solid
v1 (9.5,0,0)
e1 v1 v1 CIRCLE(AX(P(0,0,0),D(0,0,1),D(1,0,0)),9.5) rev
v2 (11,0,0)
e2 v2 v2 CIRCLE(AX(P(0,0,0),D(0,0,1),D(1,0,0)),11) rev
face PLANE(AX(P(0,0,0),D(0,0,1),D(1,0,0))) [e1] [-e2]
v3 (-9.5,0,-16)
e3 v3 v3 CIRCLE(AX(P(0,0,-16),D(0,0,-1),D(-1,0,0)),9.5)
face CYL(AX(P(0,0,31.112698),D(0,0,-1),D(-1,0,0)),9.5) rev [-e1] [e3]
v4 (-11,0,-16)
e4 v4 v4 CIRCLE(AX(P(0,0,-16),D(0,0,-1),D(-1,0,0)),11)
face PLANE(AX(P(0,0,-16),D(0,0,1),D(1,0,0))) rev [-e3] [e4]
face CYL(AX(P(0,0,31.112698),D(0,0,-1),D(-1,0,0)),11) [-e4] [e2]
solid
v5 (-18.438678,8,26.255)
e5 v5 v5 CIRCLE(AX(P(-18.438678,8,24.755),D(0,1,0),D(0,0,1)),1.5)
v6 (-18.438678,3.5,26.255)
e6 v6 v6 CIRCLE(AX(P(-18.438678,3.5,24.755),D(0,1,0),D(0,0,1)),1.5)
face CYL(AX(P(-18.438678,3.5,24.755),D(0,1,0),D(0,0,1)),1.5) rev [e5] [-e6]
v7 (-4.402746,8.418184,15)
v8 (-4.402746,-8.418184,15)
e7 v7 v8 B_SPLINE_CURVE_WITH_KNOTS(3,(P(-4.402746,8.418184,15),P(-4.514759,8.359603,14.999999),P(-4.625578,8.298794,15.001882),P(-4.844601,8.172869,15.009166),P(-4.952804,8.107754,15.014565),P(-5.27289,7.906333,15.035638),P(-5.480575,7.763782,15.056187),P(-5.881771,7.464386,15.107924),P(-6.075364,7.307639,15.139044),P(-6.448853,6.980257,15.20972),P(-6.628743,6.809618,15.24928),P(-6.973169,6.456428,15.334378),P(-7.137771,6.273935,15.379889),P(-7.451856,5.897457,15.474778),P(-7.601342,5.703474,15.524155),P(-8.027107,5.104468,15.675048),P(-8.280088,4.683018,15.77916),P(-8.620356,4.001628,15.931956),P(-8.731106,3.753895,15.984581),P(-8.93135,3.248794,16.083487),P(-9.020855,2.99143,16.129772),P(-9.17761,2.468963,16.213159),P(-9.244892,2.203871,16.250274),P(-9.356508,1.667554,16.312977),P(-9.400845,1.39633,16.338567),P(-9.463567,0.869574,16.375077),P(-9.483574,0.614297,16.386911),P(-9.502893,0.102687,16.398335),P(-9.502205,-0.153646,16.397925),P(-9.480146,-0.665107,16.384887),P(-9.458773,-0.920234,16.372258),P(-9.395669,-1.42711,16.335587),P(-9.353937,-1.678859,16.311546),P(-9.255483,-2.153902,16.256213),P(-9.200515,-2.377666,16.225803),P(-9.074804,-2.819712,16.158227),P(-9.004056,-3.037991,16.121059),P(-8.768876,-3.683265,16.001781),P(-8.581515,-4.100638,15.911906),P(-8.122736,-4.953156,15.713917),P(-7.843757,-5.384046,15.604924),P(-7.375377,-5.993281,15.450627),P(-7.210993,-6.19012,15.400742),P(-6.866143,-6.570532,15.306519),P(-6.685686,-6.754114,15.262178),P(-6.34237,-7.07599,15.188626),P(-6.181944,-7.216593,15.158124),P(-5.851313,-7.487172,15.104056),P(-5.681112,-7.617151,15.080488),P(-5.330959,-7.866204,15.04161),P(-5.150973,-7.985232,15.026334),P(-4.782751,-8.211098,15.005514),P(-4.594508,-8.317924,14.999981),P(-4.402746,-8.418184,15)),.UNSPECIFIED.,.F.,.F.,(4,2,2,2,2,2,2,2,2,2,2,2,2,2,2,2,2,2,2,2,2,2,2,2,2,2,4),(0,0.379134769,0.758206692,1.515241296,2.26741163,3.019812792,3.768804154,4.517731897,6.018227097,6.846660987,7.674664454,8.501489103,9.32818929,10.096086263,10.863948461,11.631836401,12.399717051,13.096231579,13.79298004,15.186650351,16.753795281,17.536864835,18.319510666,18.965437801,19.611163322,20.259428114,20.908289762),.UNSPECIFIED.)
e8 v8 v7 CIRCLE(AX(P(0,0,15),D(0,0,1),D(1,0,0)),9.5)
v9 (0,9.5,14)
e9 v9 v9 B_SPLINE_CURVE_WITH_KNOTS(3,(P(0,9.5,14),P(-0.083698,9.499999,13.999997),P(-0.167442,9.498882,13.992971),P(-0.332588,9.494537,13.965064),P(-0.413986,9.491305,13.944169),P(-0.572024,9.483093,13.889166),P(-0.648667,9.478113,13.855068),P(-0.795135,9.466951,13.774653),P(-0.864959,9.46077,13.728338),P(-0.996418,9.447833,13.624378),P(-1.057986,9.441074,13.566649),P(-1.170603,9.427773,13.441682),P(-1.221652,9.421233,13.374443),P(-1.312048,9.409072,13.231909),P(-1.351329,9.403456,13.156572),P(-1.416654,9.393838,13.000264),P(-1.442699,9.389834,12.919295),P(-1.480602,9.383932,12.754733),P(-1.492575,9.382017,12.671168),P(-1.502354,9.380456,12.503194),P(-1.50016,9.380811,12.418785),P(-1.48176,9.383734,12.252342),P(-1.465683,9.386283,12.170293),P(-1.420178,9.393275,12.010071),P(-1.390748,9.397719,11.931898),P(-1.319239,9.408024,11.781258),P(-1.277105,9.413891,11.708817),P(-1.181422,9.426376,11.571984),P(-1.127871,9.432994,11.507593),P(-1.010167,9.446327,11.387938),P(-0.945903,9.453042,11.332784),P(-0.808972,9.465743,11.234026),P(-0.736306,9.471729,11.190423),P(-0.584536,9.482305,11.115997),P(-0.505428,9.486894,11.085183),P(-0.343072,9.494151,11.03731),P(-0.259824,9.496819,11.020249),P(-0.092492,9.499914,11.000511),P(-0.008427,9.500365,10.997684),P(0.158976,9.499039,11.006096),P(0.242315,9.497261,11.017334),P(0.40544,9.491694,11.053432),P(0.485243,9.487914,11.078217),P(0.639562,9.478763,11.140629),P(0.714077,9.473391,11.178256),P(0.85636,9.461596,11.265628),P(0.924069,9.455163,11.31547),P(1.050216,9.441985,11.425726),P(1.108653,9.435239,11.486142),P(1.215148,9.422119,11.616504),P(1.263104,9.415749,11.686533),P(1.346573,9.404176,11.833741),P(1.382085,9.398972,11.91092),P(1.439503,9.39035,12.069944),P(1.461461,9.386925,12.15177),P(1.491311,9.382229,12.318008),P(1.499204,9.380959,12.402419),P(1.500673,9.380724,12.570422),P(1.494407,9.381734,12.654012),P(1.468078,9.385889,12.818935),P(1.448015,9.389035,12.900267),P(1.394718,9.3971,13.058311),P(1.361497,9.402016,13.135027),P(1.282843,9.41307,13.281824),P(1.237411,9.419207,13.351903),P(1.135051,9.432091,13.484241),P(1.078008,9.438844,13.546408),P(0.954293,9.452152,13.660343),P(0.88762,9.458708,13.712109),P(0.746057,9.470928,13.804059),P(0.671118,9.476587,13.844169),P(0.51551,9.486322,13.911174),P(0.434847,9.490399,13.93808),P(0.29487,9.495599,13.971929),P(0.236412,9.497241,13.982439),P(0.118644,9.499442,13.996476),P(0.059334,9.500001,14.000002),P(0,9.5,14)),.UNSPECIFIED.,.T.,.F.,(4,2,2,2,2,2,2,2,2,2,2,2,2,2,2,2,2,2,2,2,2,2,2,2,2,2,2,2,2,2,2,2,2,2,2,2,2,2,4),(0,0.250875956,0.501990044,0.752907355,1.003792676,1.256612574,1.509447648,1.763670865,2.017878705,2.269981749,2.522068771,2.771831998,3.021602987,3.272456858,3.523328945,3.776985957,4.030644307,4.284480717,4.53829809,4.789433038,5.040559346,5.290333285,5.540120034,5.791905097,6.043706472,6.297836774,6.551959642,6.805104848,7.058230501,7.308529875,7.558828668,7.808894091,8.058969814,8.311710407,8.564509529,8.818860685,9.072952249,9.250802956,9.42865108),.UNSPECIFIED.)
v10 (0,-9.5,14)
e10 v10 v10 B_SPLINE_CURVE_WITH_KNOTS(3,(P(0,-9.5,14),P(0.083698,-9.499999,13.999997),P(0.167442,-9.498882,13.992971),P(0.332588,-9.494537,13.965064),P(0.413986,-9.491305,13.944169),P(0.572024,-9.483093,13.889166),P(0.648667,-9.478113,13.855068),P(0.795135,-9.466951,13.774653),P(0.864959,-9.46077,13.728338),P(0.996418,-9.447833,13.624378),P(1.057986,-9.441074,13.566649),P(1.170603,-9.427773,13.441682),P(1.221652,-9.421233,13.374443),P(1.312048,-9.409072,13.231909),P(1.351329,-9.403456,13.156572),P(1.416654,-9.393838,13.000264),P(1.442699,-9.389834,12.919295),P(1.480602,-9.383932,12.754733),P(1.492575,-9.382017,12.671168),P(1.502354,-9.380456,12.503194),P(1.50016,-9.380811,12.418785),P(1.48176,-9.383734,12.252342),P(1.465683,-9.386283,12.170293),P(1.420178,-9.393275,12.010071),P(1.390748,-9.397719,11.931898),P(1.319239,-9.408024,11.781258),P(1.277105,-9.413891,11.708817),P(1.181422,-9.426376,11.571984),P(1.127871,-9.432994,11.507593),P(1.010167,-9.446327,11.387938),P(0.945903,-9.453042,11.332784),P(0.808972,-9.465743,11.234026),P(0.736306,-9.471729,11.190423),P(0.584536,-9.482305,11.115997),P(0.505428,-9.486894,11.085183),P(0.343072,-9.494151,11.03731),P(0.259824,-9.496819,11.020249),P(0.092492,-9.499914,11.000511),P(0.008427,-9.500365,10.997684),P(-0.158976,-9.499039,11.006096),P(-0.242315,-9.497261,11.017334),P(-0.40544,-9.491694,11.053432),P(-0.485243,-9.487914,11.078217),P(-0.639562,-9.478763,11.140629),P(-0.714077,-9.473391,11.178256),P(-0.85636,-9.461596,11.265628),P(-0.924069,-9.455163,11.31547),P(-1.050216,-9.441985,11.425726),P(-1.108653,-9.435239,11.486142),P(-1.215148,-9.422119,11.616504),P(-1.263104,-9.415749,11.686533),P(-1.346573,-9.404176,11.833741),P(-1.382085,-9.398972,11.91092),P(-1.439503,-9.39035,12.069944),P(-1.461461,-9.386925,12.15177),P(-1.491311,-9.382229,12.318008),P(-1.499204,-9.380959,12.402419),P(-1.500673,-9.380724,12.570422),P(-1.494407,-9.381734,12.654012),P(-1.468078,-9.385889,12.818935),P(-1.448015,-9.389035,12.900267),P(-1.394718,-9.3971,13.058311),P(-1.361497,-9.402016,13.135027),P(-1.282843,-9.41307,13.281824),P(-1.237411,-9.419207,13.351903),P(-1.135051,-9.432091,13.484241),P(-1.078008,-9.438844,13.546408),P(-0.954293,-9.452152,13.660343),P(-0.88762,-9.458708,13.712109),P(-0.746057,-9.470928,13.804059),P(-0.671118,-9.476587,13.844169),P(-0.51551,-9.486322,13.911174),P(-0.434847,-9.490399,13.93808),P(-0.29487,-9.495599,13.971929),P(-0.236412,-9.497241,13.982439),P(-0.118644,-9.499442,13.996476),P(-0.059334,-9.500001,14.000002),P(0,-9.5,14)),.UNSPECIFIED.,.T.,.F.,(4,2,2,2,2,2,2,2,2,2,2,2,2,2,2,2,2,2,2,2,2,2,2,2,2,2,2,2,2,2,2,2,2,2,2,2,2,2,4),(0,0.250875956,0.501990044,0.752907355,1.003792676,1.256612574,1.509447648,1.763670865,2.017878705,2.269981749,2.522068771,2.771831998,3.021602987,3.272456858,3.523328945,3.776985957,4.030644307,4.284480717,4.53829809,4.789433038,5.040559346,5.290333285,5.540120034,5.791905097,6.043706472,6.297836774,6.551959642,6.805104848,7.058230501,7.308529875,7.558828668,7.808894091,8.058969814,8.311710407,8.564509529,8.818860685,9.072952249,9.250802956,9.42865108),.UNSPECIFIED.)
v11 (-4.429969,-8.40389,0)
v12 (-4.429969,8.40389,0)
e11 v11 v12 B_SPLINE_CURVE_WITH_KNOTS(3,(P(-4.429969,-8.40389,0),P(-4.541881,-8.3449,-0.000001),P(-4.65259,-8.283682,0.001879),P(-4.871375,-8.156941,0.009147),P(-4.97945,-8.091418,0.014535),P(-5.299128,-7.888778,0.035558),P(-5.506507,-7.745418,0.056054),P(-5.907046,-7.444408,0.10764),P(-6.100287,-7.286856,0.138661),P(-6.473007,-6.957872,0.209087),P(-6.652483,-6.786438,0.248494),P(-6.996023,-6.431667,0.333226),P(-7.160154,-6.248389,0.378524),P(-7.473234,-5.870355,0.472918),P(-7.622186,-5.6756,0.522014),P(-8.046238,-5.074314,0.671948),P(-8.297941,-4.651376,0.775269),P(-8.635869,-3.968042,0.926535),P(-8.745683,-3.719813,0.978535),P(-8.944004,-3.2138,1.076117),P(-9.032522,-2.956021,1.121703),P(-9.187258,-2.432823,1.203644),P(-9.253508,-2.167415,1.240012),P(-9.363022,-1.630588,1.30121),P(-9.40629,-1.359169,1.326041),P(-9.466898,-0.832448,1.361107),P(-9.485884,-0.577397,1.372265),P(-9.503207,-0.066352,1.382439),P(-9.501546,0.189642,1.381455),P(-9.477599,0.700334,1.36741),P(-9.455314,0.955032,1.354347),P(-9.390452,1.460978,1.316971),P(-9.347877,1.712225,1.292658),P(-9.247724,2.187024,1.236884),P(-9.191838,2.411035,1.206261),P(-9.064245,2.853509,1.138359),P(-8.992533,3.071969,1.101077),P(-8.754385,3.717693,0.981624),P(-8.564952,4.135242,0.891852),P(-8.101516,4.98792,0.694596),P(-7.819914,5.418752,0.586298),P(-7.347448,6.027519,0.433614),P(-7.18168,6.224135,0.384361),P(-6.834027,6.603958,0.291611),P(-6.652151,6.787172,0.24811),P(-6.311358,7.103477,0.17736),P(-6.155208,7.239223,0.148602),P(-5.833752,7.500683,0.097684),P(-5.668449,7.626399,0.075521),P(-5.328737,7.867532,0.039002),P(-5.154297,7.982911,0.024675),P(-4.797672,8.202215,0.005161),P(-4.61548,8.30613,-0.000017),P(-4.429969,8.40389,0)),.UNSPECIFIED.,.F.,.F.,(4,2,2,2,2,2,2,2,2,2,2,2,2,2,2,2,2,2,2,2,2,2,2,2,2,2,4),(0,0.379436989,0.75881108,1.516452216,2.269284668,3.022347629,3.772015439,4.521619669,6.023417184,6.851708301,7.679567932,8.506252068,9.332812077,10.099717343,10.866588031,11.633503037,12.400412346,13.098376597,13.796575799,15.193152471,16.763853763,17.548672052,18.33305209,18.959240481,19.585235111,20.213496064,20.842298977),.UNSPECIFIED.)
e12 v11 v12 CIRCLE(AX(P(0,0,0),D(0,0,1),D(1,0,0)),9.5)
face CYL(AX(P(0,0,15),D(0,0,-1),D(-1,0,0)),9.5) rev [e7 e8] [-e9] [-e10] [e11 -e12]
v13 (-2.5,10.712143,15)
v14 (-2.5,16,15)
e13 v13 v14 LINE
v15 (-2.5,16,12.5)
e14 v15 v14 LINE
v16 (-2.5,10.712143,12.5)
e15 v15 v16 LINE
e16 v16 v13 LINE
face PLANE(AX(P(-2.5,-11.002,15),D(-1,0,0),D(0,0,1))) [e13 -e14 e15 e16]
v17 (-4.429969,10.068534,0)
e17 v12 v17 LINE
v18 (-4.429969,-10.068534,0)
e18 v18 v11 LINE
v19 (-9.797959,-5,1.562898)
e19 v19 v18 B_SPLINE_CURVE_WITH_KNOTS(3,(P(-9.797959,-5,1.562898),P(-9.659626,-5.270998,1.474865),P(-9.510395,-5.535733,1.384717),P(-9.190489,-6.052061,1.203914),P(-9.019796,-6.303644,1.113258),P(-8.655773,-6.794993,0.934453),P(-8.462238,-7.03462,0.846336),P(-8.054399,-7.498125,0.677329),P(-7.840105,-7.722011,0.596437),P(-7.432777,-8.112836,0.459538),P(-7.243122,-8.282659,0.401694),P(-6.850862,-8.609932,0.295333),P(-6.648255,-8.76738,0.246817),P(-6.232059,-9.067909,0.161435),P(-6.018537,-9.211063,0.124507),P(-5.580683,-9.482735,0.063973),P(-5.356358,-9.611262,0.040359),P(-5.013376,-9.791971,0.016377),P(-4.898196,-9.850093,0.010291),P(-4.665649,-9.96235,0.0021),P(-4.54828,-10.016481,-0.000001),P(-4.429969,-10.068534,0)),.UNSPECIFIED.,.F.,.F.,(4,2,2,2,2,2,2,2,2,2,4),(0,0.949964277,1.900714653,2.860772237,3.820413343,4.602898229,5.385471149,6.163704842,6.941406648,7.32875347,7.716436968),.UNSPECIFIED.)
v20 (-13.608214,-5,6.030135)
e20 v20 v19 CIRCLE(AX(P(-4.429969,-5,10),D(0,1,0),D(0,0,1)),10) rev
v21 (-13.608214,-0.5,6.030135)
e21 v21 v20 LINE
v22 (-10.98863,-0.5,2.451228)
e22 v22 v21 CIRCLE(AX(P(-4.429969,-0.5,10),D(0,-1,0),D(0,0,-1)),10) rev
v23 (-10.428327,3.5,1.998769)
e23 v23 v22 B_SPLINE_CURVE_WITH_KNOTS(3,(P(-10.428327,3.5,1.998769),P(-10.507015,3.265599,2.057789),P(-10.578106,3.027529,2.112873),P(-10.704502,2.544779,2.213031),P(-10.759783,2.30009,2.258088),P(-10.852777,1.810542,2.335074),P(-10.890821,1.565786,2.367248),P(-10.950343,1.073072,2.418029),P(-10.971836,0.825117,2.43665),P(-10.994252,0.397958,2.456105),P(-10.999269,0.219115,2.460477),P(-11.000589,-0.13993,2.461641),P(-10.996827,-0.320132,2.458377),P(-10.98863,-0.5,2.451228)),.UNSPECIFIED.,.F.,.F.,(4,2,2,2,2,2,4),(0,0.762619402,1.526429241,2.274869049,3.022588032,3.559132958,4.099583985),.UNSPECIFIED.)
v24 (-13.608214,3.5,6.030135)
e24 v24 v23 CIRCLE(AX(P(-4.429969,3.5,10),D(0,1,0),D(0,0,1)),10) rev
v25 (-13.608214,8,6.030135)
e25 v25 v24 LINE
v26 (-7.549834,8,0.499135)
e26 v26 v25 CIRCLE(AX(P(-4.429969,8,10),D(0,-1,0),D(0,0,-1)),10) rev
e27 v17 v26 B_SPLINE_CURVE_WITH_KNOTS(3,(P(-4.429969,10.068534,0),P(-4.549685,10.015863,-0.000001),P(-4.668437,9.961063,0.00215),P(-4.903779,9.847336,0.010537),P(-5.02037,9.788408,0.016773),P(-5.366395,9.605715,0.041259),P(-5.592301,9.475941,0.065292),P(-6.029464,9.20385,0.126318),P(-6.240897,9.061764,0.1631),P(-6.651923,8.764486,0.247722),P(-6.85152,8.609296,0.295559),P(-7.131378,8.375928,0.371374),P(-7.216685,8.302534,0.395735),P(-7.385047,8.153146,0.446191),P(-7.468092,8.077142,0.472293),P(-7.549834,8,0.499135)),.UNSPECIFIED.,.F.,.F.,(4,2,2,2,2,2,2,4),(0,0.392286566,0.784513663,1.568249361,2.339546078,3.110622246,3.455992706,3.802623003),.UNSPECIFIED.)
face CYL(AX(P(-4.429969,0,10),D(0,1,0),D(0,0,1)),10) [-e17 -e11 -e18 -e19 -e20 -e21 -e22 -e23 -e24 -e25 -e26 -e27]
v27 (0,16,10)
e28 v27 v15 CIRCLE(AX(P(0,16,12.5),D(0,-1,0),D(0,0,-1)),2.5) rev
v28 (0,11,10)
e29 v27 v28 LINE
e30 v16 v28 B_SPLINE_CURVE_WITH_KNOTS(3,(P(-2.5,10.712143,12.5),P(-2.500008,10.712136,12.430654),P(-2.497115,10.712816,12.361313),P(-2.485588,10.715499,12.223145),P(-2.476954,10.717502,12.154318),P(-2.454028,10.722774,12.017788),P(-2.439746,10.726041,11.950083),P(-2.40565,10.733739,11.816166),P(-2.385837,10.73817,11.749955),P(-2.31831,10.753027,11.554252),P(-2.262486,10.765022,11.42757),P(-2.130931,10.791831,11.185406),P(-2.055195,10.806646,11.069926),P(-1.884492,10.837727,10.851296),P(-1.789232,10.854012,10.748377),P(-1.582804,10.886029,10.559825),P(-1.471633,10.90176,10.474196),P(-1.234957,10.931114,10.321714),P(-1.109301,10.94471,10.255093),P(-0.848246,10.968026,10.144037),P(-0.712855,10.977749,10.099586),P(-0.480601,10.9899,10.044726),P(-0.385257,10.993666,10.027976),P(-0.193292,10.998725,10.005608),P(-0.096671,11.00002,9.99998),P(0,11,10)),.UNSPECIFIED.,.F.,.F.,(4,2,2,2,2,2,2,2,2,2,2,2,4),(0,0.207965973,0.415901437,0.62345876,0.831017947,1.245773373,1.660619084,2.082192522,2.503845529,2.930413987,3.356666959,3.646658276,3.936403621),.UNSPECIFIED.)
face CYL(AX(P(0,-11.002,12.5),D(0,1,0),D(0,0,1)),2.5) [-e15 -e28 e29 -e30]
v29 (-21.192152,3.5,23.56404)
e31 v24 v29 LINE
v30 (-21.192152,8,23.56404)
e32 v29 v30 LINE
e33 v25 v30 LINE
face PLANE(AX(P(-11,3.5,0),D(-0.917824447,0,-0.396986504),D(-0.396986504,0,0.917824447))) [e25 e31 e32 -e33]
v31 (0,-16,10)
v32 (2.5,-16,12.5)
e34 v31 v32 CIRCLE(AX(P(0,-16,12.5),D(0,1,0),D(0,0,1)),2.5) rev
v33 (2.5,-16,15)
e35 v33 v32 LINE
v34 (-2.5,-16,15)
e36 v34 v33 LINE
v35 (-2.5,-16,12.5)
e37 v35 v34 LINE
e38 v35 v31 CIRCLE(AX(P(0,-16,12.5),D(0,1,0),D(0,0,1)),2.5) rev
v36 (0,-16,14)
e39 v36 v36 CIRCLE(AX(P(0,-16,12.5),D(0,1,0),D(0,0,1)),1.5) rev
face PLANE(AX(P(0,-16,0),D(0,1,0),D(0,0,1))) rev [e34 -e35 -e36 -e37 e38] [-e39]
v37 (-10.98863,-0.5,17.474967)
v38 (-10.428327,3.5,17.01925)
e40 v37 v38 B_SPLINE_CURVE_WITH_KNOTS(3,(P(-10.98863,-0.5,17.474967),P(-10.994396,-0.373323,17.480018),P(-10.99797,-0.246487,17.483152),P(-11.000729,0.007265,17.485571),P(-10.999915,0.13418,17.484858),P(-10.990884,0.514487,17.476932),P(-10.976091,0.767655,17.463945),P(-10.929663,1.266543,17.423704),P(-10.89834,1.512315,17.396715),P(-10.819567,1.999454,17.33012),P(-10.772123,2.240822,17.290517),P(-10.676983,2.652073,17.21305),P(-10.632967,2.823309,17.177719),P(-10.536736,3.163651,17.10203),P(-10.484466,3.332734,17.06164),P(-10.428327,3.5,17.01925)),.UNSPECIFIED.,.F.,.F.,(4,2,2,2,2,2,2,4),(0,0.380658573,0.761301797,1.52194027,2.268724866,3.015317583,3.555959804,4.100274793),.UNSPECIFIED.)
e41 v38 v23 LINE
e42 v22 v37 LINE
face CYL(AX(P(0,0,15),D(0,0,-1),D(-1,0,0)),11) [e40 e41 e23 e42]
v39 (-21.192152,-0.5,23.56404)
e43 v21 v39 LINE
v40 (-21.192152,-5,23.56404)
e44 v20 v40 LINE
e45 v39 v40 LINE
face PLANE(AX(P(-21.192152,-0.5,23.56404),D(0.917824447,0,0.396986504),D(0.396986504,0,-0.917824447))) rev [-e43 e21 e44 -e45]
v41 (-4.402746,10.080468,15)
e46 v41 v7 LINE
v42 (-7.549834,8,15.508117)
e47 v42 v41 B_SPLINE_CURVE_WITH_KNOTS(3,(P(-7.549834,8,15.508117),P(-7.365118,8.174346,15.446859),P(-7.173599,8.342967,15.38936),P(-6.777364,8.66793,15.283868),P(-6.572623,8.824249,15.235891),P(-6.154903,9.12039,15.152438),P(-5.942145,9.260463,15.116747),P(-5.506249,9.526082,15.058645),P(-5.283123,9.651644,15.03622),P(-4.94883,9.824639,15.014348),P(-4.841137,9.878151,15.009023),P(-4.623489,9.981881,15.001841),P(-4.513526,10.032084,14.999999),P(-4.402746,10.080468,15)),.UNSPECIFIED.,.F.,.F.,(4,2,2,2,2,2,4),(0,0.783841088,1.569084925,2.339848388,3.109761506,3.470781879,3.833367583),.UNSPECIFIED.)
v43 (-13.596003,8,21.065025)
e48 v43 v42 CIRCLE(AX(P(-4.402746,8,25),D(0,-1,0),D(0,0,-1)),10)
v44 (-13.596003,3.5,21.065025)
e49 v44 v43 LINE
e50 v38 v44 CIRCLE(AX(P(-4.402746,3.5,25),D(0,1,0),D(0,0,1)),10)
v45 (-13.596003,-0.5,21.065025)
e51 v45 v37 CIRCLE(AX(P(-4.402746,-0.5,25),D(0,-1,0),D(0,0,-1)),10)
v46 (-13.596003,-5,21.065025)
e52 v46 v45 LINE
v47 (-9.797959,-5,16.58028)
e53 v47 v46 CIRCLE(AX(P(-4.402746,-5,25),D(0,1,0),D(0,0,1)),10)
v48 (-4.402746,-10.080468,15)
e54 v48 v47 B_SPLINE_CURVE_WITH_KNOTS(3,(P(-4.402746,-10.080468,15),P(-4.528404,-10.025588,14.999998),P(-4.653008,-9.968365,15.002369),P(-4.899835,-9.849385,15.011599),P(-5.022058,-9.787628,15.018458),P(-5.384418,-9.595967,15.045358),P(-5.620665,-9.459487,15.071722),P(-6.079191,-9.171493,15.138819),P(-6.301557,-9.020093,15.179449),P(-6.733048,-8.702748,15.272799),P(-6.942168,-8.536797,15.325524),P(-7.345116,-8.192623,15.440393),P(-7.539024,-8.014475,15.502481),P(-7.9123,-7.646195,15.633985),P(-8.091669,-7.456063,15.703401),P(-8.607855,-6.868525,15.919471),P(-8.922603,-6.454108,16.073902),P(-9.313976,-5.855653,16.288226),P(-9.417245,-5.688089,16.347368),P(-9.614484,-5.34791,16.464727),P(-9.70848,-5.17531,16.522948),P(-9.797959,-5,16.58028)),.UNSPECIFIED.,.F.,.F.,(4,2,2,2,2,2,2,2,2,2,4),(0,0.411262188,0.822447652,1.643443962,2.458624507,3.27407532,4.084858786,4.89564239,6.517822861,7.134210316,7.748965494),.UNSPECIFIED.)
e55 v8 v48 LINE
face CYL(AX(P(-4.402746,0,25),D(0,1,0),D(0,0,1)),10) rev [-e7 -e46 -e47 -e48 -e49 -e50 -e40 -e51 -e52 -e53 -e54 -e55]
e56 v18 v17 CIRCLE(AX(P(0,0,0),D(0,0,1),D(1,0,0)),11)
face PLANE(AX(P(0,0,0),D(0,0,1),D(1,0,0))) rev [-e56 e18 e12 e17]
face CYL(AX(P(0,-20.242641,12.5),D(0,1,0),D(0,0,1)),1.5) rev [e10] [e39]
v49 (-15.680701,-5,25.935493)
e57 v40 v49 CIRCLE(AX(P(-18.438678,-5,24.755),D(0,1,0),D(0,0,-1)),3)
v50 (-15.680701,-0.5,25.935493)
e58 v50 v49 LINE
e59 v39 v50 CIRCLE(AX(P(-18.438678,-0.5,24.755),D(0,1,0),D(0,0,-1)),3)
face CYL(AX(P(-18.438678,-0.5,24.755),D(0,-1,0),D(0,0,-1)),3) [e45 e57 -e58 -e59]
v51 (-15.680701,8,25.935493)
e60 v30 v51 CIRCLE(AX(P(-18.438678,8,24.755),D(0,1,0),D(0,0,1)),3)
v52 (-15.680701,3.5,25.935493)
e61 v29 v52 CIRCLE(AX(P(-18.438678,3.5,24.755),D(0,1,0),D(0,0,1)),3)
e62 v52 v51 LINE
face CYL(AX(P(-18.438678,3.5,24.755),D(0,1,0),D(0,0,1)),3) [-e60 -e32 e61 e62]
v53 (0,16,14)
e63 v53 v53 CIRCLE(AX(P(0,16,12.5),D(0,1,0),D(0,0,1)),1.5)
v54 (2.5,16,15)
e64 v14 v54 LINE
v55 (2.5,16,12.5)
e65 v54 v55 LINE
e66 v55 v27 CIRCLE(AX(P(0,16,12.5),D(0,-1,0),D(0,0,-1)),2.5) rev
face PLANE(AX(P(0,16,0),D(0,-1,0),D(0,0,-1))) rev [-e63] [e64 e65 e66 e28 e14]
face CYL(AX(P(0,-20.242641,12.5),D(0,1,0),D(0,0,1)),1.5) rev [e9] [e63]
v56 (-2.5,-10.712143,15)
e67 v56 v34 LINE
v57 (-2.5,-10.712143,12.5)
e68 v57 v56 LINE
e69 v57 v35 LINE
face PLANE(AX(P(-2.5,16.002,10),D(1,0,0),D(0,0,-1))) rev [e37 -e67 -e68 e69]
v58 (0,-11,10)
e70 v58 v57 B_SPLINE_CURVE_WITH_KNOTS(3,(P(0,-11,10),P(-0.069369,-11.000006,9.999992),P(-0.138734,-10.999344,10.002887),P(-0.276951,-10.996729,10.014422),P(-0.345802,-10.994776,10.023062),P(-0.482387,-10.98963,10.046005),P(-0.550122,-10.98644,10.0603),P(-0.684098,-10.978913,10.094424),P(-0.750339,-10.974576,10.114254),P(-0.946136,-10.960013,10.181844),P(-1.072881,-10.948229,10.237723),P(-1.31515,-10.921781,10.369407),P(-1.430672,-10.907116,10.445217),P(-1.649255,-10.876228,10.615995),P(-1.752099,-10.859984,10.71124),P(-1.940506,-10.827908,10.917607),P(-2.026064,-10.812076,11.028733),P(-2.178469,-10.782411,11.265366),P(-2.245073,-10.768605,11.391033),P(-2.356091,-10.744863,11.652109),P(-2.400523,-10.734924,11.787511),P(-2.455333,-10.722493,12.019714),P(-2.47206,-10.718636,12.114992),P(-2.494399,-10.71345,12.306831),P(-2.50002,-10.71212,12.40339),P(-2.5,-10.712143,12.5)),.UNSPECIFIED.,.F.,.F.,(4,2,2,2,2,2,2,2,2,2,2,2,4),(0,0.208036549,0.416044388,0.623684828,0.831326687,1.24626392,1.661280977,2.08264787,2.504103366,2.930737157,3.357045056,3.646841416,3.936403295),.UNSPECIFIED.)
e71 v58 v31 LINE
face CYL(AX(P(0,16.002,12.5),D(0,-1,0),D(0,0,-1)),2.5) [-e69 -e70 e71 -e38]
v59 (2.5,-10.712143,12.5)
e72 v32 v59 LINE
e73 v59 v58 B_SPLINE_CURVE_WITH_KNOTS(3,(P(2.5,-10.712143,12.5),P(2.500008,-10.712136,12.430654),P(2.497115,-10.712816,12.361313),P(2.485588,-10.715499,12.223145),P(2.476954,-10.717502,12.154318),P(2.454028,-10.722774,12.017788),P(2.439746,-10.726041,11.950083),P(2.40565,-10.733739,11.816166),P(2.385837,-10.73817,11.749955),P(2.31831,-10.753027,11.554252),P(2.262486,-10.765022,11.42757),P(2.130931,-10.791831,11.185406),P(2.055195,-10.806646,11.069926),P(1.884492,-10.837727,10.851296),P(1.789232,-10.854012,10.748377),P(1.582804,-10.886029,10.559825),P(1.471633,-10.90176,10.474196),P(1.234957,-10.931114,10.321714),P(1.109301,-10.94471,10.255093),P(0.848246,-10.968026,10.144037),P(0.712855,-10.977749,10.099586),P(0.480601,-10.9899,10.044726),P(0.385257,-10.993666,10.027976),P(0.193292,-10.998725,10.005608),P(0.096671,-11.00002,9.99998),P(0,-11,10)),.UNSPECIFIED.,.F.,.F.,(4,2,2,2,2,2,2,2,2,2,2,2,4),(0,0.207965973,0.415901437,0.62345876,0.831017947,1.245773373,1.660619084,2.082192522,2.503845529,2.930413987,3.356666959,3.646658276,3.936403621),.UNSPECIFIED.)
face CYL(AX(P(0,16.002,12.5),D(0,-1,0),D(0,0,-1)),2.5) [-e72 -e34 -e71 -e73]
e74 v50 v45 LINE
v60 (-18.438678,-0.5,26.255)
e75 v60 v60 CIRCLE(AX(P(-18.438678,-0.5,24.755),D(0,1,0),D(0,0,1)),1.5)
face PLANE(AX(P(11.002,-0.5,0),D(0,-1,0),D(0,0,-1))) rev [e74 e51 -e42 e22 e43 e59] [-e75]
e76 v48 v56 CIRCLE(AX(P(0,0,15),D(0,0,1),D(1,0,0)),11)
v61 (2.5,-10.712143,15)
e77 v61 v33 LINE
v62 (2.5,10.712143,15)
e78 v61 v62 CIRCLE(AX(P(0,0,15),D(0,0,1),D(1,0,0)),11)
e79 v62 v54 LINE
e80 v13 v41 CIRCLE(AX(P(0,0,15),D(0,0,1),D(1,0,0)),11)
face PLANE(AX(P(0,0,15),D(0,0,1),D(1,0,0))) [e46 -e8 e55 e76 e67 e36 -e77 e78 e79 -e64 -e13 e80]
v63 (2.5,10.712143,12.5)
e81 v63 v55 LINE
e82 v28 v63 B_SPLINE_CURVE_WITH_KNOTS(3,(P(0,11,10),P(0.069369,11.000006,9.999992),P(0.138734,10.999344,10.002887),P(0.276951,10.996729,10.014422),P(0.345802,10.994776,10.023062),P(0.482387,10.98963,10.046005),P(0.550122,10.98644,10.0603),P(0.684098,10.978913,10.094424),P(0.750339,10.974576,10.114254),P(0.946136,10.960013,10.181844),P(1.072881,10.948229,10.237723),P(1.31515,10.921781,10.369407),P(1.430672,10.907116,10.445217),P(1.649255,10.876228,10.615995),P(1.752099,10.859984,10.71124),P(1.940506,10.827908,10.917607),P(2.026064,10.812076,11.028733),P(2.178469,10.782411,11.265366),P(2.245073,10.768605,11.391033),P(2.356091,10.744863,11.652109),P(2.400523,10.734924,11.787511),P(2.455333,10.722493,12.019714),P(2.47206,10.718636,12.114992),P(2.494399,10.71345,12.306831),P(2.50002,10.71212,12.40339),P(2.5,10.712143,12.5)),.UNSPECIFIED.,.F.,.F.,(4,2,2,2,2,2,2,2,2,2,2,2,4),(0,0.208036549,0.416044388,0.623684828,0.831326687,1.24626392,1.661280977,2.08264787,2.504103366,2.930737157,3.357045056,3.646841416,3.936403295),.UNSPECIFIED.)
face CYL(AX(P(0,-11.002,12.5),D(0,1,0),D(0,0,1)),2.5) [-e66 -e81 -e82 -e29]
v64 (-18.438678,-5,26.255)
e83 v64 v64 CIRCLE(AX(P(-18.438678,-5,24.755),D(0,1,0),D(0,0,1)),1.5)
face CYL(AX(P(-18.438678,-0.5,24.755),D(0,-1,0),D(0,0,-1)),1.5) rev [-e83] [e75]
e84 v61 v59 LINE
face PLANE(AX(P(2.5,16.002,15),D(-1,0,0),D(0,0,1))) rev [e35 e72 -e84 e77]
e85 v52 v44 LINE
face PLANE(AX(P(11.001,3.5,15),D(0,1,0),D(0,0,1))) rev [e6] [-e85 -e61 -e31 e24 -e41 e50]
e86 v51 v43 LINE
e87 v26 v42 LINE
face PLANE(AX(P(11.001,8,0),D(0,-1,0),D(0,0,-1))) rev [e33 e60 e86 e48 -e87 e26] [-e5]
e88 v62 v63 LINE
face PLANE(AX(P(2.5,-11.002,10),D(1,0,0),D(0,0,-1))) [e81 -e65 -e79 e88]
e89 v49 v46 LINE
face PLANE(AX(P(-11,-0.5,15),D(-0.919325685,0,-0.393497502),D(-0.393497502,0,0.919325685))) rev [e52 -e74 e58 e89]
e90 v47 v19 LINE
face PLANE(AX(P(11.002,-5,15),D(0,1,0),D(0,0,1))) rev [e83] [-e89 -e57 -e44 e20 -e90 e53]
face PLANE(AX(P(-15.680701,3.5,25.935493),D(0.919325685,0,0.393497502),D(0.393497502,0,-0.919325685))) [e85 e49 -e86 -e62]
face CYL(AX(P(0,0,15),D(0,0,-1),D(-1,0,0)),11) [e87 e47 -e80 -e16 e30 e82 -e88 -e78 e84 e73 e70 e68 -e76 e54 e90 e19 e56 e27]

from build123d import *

# Parameters (mm, degrees)
CROQUIS1_R                   = 11
CROQUIS1_R_2                 = 9.5
SALIENTE_EXTRUIR1_DEPTH      = 15
SALIENTE_EXTRUIR2_REACH      = 34.787
SALIENTE_EXTRUIR2_END_RADIUS = 11
CROQUIS2_W                   = 5
CROQUIS2_H                   = 5
SALIENTE_EXTRUIR3_REACH      = 39.014
SALIENTE_EXTRUIR3_END_RADIUS = 11
CROQUIS3_W                   = 5
CROQUIS3_H                   = 5
CORTAR_EXTRUIR1_REACH        = 39.014
CROQUIS4_R                   = 1.5
REDONDEO1_R                  = 2.5
CROQUIS5_R                   = 1.5
SALIENTE_EXTRUIR4_DEPTH      = 4.5
SALIENTE_EXTRUIR5_REACH      = 40.863
CROQUIS6_W                   = 15
CROQUIS6_H                   = 4.5
CROQUIS7_R                   = 1.5
SALIENTE_EXTRUIR6_DEPTH      = 4.5
SALIENTE_EXTRUIR7_REACH      = 40.863
SALIENTE_EXTRUIR7_END_RADIUS = 11
CROQUIS8_W                   = 15
CROQUIS8_H                   = 4.5
REDONDEO4_R                  = 10
CROQUIS17_R                  = 9.5
SALIENTE_EXTRUIR13_DEPTH     = 16
REDONDEO5_R                  = 10


# Some blends are built 0.0001 mm under size
with BuildPart() as part:
    # Croquis1 → Saliente-Extruir1 (new body)
    with BuildSketch(Plane.XY):
        Circle(CROQUIS1_R)
        Circle(CROQUIS1_R_2, mode=Mode.SUBTRACT)
    extrude(amount=SALIENTE_EXTRUIR1_DEPTH)

    # Saliente-Extruir2: up to this cylinder (the profile starts outside it)
    saliente_extruir2_end = Plane(origin=(0, 0, 12.5), z_dir=(0, 0, -1)) * Cylinder(SALIENTE_EXTRUIR2_END_RADIUS, 92.574, mode=Mode.PRIVATE)
    # Croquis2 → Saliente-Extruir2 (add, up to the surface)
    with BuildSketch(Plane(origin=(0, 16, 0), x_dir=(1, 0, 0), z_dir=(0, 1, 0)), mode=Mode.PRIVATE) as saliente_extruir2_sk1:
        with Locations((0, -12.5)):
            Rectangle(CROQUIS2_W, CROQUIS2_H)
    saliente_extruir2_tool1 = extrude(saliente_extruir2_sk1.sketch, amount=-SALIENTE_EXTRUIR2_REACH, mode=Mode.PRIVATE) - saliente_extruir2_end
    add(saliente_extruir2_tool1.solids().sort_by_distance((0, 16, 12.5))[0])

    # Saliente-Extruir3: up to this cylinder (the profile starts outside it)
    saliente_extruir3_end = Plane(origin=(0, 0, 12.5), z_dir=(0, 0, -1)) * Cylinder(SALIENTE_EXTRUIR3_END_RADIUS, 101.028, mode=Mode.PRIVATE)
    # Croquis3 → Saliente-Extruir3 (add, up to the surface)
    with BuildSketch(Plane(origin=(0, -16, 0), x_dir=(1, 0, 0), z_dir=(0, 1, 0)), mode=Mode.PRIVATE) as saliente_extruir3_sk1:
        with Locations((0, -12.5)):
            Rectangle(CROQUIS3_W, CROQUIS3_H)
    saliente_extruir3_tool1 = extrude(saliente_extruir3_sk1.sketch, amount=SALIENTE_EXTRUIR3_REACH, mode=Mode.PRIVATE) - saliente_extruir3_end
    add(saliente_extruir3_tool1.solids().sort_by_distance((0, -16, 12.5))[0])

    # Cortar-Extruir1: up to this face of the body (flat: up to its plane)
    cortar_extruir1_end = Plane(part.part.faces().sort_by_distance((0, -16, 12.5))[0])
    # Croquis4 → Cortar-Extruir1 (cut, up to the picked face)
    with BuildSketch(Plane(origin=(0, 16, 0), x_dir=(1, 0, 0), z_dir=(0, 1, 0)), mode=Mode.PRIVATE) as cortar_extruir1_sk1:
        with Locations(Location((0, -12.5, 0), (0, 0, 270))):
            Circle(CROQUIS4_R)
    cortar_extruir1_tool1 = split(extrude(cortar_extruir1_sk1.sketch, amount=-CORTAR_EXTRUIR1_REACH, mode=Mode.PRIVATE), bisect_by=cortar_extruir1_end, keep=Keep.BOTH, mode=Mode.PRIVATE)
    add(cortar_extruir1_tool1.solids().sort_by(Axis((0, 16, 12.5), (0, -1, 0)))[0], mode=Mode.SUBTRACT)

    # Redondeo1
    redondeo1_edges = [part.edges().sort_by_distance(p)[0] for p in [
        (-2.5, -13.356071321, 10),
        (2.5, -13.356071321, 10),
        (-2.5, 13.356071321, 10),
        (2.5, 13.356071321, 10),
    ]]
    fillet(redondeo1_edges, radius=REDONDEO1_R - 0.0001)  # a hair under: the kernel refuses the full size

    # Croquis6 → Saliente-Extruir5 (add, up to next)
    with BuildSketch(Plane(origin=(-11, 0, 0), x_dir=(0, 0, -1), z_dir=(1, 0, 0)), mode=Mode.PRIVATE) as saliente_extruir5_sk1:
        with Locations((-7.5, -2.75)):
            Rectangle(CROQUIS6_W, CROQUIS6_H)
    saliente_extruir5_tool1 = extrude(saliente_extruir5_sk1.sketch, amount=SALIENTE_EXTRUIR5_REACH, mode=Mode.PRIVATE) - part.part


with BuildPart() as body_2:
    # Croquis5 → Saliente-Extruir4 (new body)
    with BuildSketch(Plane(origin=(0, -5, 0), x_dir=(1, 0, 0), z_dir=(0, 1, 0))):
        with BuildLine():
            Line((-11, -15), (-15.680701356, -25.935492506))
            ThreePointArc((-15.680701356, -25.935492506), (-19.62440656, -27.510730169), (-21.192151754, -23.564040489))
            Line((-21.192151754, -23.564040489), (-11, 0))
            Line((-11, 0), (-11, -15))
        make_face()
        with Locations(Location((-18.438678413, -24.755, 0), (0, 0, 270))):
            Circle(CROQUIS5_R, mode=Mode.SUBTRACT)
    extrude(amount=SALIENTE_EXTRUIR4_DEPTH)


with BuildPart() as part_1:
    add(part.part)

    add(body_2.part)  # Saliente-Extruir5 merges body 2
    add(saliente_extruir5_tool1.solids().sort_by_distance((-11, -2.75, 7.5))[0])



with BuildPart() as body_2_2:
    # Croquis7 → Saliente-Extruir6 (new body)
    with BuildSketch(Plane(origin=(0, 8, 0), x_dir=(1, 0, 0), z_dir=(0, 1, 0))):
        with BuildLine():
            Line((-15.680701356, -25.935492506), (-11, -15))
            Line((-11, -15), (-11, 0))
            Line((-11, 0), (-21.192151754, -23.564040489))
            ThreePointArc((-21.192151754, -23.564040489), (-19.62440656, -27.510730169), (-15.680701356, -25.935492506))
        make_face()
        with Locations(Location((-18.438678413, -24.755, 0), (0, 0, 270))):
            Circle(CROQUIS7_R, mode=Mode.SUBTRACT)
    extrude(amount=-SALIENTE_EXTRUIR6_DEPTH)


with BuildPart() as part_2:
    add(part_1.part)

    add(body_2_2.part)  # Saliente-Extruir7 merges body 2 2
    # Saliente-Extruir7: up to this cylinder (the profile starts outside it)
    saliente_extruir7_end = Plane(origin=(0, 0, 7.5), z_dir=(0, 0, -1)) * Cylinder(SALIENTE_EXTRUIR7_END_RADIUS, 104.726, mode=Mode.PRIVATE)
    # Croquis8 → Saliente-Extruir7 (add, up to the surface)
    with BuildSketch(Plane(origin=(-11, 0, 0), x_dir=(0, 0, -1), z_dir=(1, 0, 0)), mode=Mode.PRIVATE) as saliente_extruir7_sk1:
        with Locations((-7.5, 5.75)):
            Rectangle(CROQUIS8_W, CROQUIS8_H)
    saliente_extruir7_tool1 = extrude(saliente_extruir7_sk1.sketch, amount=SALIENTE_EXTRUIR7_REACH, mode=Mode.PRIVATE) - saliente_extruir7_end
    add(saliente_extruir7_tool1.solids().sort_by_distance((-11, 5.75, 7.5))[0])

    # Redondeo4
    # the kernel refuses this fillet: 10 mm, written as the material it adds along each edge
    with BuildSketch(Plane(origin=(-11, 8, 15), x_dir=(1, 0, 0), z_dir=(0, -1, 0))) as redondeo4_piece_1_section:
        with BuildLine():
            CenterArc((REDONDEO4_R * 0.659725391862, REDONDEO4_R), REDONDEO4_R, 203.1723, 66.8277)
            Line((-REDONDEO4_R * 0.259600293631, REDONDEO4_R * 0.606502498111), (0, 0))
            Line((0, 0), (REDONDEO4_R * 0.659725391862, 0))
        make_face()
    redondeo4_piece_1 = extrude(amount=4.5, mode=Mode.PRIVATE)
    redondeo4_piece_1 = redondeo4_piece_1 - Plane(origin=(0, 0, 16.61768541), x_dir=(1, 0, 0), z_dir=(0, 0, -1)) * Cylinder(9.5, 36, mode=Mode.PRIVATE)
    add(redondeo4_piece_1)
    with BuildSketch(Plane(origin=(-11, 24.493134797, 15), x_dir=(1, 0, 0), z_dir=(0, -1, 0))) as redondeo4_piece_2_section:
        with BuildLine():
            CenterArc((REDONDEO4_R * 0.659725391862, REDONDEO4_R), REDONDEO4_R, 203.1723, 66.8277)
            Line((-REDONDEO4_R * 0.259600293631, REDONDEO4_R * 0.606502498111), (0, 0))
            Line((0, 0), (REDONDEO4_R * 0.659725391862, 0))
        make_face()
    redondeo4_piece_2 = extrude(amount=37.486269593, mode=Mode.PRIVATE)
    redondeo4_piece_2 = redondeo4_piece_2 & Plane(origin=(0, 0, 15.105091538), x_dir=(1, 0, 0), z_dir=(0, 0, -1)) * Cylinder(11, 102, mode=Mode.PRIVATE)
    redondeo4_piece_2 = redondeo4_piece_2 - Plane(origin=(0, 0, 15.105091538), x_dir=(1, 0, 0), z_dir=(0, 0, -1)) * Cylinder(9.5, 102, mode=Mode.PRIVATE)
    add(redondeo4_piece_2)
    with BuildSketch(Plane(origin=(-11, 24.493134797, 15), x_dir=(1, 0, 0), z_dir=(0, -1, 0))) as redondeo4_piece_3_section:
        with BuildLine():
            CenterArc((REDONDEO4_R * 0.659725391862, REDONDEO4_R), REDONDEO4_R, 203.1723, 66.8277)
            Line((-REDONDEO4_R * 0.259600293631, REDONDEO4_R * 0.606502498111), (0, 0))
            Line((0, 0), (REDONDEO4_R * 0.659725391862, 0))
        make_face()
    redondeo4_piece_3 = extrude(amount=37.486269593, mode=Mode.PRIVATE)
    redondeo4_piece_3 = split(redondeo4_piece_3, bisect_by=Plane(origin=(-11.425826718, -5, 17.078004586), z_dir=(0, 1, 0)), keep=Keep.TOP, mode=Mode.PRIVATE)
    redondeo4_piece_3 = split(redondeo4_piece_3, bisect_by=Plane(origin=(-11.425826718, -0.5, 17.078004586), z_dir=(0, -1, 0)), keep=Keep.TOP, mode=Mode.PRIVATE)
    redondeo4_piece_3 = redondeo4_piece_3 - Plane(origin=(0, 0, 17.078004586), x_dir=(1, 0, 0), z_dir=(0, 0, -1)) * Cylinder(9.5, 102, mode=Mode.PRIVATE)
    add(redondeo4_piece_3)

    # Redondeo5
    # the kernel refuses this fillet: 10 mm, written as the material it takes off along each edge
    with BuildSketch(Plane(origin=(-11, -21.425077205, 0), x_dir=(1, 0, 0), z_dir=(0, 1, 0))) as redondeo5_piece_1:
        with BuildLine():
            CenterArc((REDONDEO5_R * 0.657003088186, -REDONDEO5_R), REDONDEO5_R, 90, 66.610075059)
            Line((-REDONDEO5_R * 0.260821358969, -REDONDEO5_R * 0.603013496194), (0, 0))
            Line((0, 0), (REDONDEO5_R * 0.657003088186, 0))
        make_face()
    extrude(amount=37.350154409, mode=Mode.SUBTRACT)


with BuildPart() as body_2_3:
    # Croquis17 → Saliente-Extruir13 (new body)
    with BuildSketch(Plane(origin=(0, 0, -16), x_dir=(-1, 0, 0), z_dir=(0, 0, -1))):
        with BuildLine():
            ThreePointArc((7.549834435, 8), (-10.839118231, -1.874437511), (9.797958971, -5))
            ThreePointArc((9.797958971, -5), (10.63405263, -2.813703017), (10.988630488, -0.5))
            ThreePointArc((10.988630488, -0.5), (10.893645622, 1.525937434), (10.428326807, 3.5))
            ThreePointArc((10.428326807, 3.5), (9.266394683, 5.927388091), (7.549834435, 8))
        make_face()
        Circle(CROQUIS17_R, mode=Mode.SUBTRACT)
    extrude(amount=-SALIENTE_EXTRUIR13_DEPTH)


solid = Compound([part_2.part, body_2_3.part])
